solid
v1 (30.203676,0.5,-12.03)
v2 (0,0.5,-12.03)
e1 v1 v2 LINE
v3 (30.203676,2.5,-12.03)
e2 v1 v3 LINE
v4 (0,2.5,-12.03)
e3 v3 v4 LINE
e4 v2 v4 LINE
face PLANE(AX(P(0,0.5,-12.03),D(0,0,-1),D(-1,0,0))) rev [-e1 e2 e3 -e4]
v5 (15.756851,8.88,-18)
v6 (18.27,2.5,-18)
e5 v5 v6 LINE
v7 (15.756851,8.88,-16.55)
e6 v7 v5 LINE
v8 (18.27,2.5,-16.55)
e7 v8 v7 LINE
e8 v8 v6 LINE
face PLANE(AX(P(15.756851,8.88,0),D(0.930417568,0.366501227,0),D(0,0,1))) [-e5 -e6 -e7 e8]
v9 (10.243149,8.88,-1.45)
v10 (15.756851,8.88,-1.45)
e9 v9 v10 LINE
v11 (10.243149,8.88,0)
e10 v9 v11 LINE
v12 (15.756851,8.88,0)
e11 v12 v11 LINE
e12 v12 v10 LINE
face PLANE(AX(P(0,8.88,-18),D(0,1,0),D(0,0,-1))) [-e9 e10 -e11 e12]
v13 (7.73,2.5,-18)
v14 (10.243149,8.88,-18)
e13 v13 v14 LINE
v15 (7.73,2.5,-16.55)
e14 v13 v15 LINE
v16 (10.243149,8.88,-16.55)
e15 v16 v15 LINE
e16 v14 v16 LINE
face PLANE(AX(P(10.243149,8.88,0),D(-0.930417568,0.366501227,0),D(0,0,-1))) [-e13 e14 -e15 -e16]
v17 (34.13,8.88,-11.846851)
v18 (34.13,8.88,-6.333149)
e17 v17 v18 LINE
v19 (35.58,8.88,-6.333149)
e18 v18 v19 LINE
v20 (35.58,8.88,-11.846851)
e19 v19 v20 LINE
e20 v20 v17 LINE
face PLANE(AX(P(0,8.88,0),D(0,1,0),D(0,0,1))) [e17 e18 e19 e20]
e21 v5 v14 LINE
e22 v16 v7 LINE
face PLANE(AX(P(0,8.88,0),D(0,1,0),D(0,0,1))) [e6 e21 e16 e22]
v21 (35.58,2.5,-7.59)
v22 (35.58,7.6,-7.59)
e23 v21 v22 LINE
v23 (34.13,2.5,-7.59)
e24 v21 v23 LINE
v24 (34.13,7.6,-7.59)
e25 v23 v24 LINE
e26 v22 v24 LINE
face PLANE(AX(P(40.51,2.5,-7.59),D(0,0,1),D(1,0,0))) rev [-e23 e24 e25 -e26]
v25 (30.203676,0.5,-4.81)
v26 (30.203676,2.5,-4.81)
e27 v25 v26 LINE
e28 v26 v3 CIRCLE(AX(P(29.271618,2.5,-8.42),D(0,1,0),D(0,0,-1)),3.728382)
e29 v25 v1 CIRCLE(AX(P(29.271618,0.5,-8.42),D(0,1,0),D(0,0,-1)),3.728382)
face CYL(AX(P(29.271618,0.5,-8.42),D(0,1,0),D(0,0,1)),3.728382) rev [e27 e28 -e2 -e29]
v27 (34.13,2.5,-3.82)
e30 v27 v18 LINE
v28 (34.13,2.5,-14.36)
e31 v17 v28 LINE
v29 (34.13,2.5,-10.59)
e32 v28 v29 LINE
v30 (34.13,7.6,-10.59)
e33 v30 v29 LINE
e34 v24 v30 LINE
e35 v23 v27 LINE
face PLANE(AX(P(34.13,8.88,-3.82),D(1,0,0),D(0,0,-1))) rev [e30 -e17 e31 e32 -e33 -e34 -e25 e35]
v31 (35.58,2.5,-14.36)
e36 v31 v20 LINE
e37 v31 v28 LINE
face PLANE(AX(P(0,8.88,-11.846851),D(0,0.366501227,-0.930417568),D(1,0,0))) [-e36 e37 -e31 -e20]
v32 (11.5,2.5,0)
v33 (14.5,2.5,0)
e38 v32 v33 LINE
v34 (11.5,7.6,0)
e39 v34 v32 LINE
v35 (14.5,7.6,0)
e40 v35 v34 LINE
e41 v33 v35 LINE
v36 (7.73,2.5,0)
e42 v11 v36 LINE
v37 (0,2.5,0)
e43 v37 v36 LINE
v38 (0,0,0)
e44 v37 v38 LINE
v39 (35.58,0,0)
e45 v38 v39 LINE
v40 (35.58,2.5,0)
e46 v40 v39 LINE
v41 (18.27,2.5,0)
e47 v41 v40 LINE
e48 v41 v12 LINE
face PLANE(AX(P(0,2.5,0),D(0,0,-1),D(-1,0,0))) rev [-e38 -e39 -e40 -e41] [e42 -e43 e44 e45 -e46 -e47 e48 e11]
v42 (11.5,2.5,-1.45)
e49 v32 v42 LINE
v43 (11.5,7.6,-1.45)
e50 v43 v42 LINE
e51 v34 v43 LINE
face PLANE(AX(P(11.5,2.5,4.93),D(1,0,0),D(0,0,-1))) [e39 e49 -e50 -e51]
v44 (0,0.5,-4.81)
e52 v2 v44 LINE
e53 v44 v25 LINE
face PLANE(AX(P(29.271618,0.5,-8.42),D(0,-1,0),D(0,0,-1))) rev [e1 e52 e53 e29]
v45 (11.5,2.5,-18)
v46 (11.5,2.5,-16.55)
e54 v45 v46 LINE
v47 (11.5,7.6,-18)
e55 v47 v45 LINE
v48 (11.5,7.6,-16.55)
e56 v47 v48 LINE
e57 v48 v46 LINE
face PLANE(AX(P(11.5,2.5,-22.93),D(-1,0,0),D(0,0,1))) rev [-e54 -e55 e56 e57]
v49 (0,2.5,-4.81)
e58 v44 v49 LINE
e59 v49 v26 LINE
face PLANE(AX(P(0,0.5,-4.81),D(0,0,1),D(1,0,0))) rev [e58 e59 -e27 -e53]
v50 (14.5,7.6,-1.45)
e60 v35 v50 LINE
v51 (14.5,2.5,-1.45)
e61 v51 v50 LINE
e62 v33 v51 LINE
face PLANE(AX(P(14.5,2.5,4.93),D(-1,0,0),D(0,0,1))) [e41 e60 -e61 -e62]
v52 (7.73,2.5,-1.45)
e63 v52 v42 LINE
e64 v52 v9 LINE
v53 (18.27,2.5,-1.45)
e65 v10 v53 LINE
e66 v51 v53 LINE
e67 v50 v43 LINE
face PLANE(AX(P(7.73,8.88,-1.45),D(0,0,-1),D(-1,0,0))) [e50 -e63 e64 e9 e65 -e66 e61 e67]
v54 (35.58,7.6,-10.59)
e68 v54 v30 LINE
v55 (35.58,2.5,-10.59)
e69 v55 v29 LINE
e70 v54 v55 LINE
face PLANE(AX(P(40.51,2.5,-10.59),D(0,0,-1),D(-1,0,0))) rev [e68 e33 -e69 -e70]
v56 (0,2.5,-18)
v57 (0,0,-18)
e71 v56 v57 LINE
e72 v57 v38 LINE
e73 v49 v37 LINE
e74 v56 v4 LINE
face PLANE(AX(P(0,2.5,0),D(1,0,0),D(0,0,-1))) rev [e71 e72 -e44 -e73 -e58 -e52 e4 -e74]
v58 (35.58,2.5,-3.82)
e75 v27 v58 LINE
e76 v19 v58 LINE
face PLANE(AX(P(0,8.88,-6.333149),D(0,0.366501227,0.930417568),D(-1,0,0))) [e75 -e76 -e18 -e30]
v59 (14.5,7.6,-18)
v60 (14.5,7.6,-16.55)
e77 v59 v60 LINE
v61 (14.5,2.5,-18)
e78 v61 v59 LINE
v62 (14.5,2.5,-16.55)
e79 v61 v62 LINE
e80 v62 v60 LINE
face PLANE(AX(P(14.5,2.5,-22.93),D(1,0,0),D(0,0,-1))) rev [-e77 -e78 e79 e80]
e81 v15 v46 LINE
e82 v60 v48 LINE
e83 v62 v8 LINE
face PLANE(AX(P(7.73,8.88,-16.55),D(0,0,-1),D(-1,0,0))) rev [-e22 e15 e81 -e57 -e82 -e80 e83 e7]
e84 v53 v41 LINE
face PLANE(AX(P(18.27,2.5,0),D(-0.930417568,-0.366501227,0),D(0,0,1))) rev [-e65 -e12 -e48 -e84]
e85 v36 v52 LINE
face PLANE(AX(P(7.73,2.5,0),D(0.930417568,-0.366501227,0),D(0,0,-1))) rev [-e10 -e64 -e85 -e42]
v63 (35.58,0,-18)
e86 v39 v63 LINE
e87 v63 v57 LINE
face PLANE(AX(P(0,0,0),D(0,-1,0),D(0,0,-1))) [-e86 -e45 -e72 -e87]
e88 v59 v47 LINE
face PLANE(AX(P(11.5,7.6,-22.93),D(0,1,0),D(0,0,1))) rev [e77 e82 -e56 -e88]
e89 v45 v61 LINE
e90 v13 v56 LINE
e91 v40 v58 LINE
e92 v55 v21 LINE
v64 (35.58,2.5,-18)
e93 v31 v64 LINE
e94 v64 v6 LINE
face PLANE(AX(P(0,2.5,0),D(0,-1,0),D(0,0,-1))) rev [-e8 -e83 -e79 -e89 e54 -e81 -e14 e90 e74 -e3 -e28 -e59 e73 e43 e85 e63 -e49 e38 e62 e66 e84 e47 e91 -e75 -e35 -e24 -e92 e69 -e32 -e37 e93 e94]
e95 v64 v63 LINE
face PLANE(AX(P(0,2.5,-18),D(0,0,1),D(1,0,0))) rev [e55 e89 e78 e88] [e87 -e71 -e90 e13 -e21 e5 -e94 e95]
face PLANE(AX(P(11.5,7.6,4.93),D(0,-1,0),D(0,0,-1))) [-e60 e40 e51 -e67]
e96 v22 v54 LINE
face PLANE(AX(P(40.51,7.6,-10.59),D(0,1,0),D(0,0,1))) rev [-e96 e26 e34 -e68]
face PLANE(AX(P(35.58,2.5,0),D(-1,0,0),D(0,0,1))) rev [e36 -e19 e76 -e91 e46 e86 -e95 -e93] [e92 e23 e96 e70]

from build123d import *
from OCP.BRepFilletAPI import BRepFilletAPI_MakeChamfer

# Parameters (mm, degrees)
SKETCH1_W                  = 35.58
SKETCH1_H                  = 18
BOSS_EXTRUDE1_DEPTH        = 2.5
CUT_EXTRUDE1_DEPTH         = 2
SKETCH3_W                  = 10.54
SKETCH3_H                  = 1.45
BOSS_EXTRUDE2_DEPTH        = 6.38
CHAMFER1_SIZE              = 6.38
CHAMFER1_SIZE_2            = 2.513148834
SKETCH4_W                  = 3
SKETCH4_H                  = 5.1
CUT_EXTRUDE2_DEPTH         = 6.38
CHAMFER1_OF_MIRROR1_SIZE   = 6.38
CHAMFER1_OF_MIRROR1_SIZE_2 = 2.513148834
SKETCH14_W                 = 1.45
SKETCH14_H                 = 10.54
BOSS_EXTRUDE5_DEPTH        = 6.38
CHAMFER4_SIZE              = 6.38
CHAMFER4_SIZE_2            = 2.513148834
SKETCH15_W                 = 3
SKETCH15_H                 = 5.1
CUT_EXTRUDE4_DEPTH         = 6.38


with BuildPart() as part:
    # Sketch1 → Boss-Extrude1 (new body)
    with BuildSketch(Plane(origin=(0, 0, 0), x_dir=(1, 0, 0), z_dir=(0, 1, 0))):
        with Locations((17.79, 9)):
            Rectangle(SKETCH1_W, SKETCH1_H)
    extrude(amount=BOSS_EXTRUDE1_DEPTH)

    # Sketch2 → Cut-Extrude1 (cut)
    with BuildSketch(Plane(origin=(0, 2.5, 0), x_dir=(1, 0, 0), z_dir=(0, 1, 0))):
        with BuildLine():
            Line((0, 12.03), (30.203676308, 12.03))
            ThreePointArc((30.203676308, 12.03), (33, 8.42), (30.203676308, 4.81))
            Line((30.203676308, 4.81), (0, 4.81))
            Line((0, 4.81), (0, 12.03))
        make_face()
    extrude(amount=-CUT_EXTRUDE1_DEPTH, mode=Mode.SUBTRACT)

    # Sketch3 → Boss-Extrude2 (add)
    with BuildSketch(Plane(origin=(0, 2.5, 0), x_dir=(1, 0, 0), z_dir=(0, 1, 0))):
        with Locations((13, 17.275)):
            Rectangle(SKETCH3_W, SKETCH3_H)
    boss_extrude2 = extrude(amount=BOSS_EXTRUDE2_DEPTH)

    # Chamfer1
    chamfer1_edges_1 = [part.edges().sort_by_distance(p)[0] for p in [
        (18.27, 8.88, -17.275),
    ]]
    chamfer1_side_1 = [part.faces().sort_by_distance(p)[0] for p in [
        (18.27, 8.829737023, -17.275),
    ]]
    chamfer1_edges_2 = [part.edges().sort_by_distance(p)[0] for p in [
        (7.73, 8.88, -17.275),
    ]]
    chamfer1_side_2 = [part.faces().sort_by_distance(p)[0] for p in [
        (7.73, 8.829737023, -17.275),
    ]]
    chamfer1 = BRepFilletAPI_MakeChamfer(part.part.solid().wrapped)
    for e in chamfer1_edges_1:
        chamfer1.Add(CHAMFER1_SIZE - 0.0001, CHAMFER1_SIZE_2 - 0.0001, e.wrapped, chamfer1_side_1[0].wrapped)
    for e in chamfer1_edges_2:
        chamfer1.Add(CHAMFER1_SIZE - 0.0001, CHAMFER1_SIZE_2 - 0.0001, e.wrapped, chamfer1_side_2[0].wrapped)
    add(Compound.cast(chamfer1.Shape()), mode=Mode.REPLACE)  # a hair under: the kernel refuses the full size

    # Sketch4 → Cut-Extrude2 (cut)
    with BuildSketch(Plane.XY.offset(-16.55)):
        with Locations((13, 5.05)):
            Rectangle(SKETCH4_W, SKETCH4_H)
    cut_extrude2 = extrude(amount=-CUT_EXTRUDE2_DEPTH, mode=Mode.SUBTRACT)

    # Mirror1: Boss-Extrude2, Cut-Extrude2 across plane
    add(boss_extrude2.mirror(Plane.XY.offset(-9)))
    add(cut_extrude2.mirror(Plane.XY.offset(-9)), mode=Mode.SUBTRACT)

    # Chamfer1 of Mirror1
    chamfer1_of_mirror1_edges_1 = [part.edges().sort_by_distance(p)[0] for p in [
        (18.27, 8.88, -0.725),
    ]]
    chamfer1_of_mirror1_side_1 = [part.faces().sort_by_distance(p)[0] for p in [
        (18.27, 8.829737023, -0.725),
    ]]
    chamfer1_of_mirror1_edges_2 = [part.edges().sort_by_distance(p)[0] for p in [
        (7.73, 8.88, -0.725),
    ]]
    chamfer1_of_mirror1_side_2 = [part.faces().sort_by_distance(p)[0] for p in [
        (7.73, 8.829737023, -0.725),
    ]]
    chamfer1_of_mirror1 = BRepFilletAPI_MakeChamfer(part.part.solid().wrapped)
    for e in chamfer1_of_mirror1_edges_1:
        chamfer1_of_mirror1.Add(CHAMFER1_OF_MIRROR1_SIZE - 0.0001, CHAMFER1_OF_MIRROR1_SIZE_2 - 0.0001, e.wrapped, chamfer1_of_mirror1_side_1[0].wrapped)
    for e in chamfer1_of_mirror1_edges_2:
        chamfer1_of_mirror1.Add(CHAMFER1_OF_MIRROR1_SIZE - 0.0001, CHAMFER1_OF_MIRROR1_SIZE_2 - 0.0001, e.wrapped, chamfer1_of_mirror1_side_2[0].wrapped)
    add(Compound.cast(chamfer1_of_mirror1.Shape()), mode=Mode.REPLACE)  # a hair under: the kernel refuses the full size

    # Sketch14 → Boss-Extrude5 (add)
    with BuildSketch(Plane(origin=(0, 2.5, 0), x_dir=(1, 0, 0), z_dir=(0, 1, 0))):
        with Locations((34.855, 9.09)):
            Rectangle(SKETCH14_W, SKETCH14_H)
    extrude(amount=BOSS_EXTRUDE5_DEPTH)

    # Chamfer4
    chamfer4_edges_1 = [part.edges().sort_by_distance(p)[0] for p in [
        (34.855, 8.88, -14.36),
    ]]
    chamfer4_side_1 = [part.faces().sort_by_distance(p)[0] for p in [
        (34.855, 8.829737023, -14.36),
    ]]
    chamfer4_edges_2 = [part.edges().sort_by_distance(p)[0] for p in [
        (34.855, 8.88, -3.82),
    ]]
    chamfer4_side_2 = [part.faces().sort_by_distance(p)[0] for p in [
        (34.855, 8.829737023, -3.82),
    ]]
    chamfer4 = BRepFilletAPI_MakeChamfer(part.part.solid().wrapped)
    for e in chamfer4_edges_1:
        chamfer4.Add(CHAMFER4_SIZE - 0.0001, CHAMFER4_SIZE_2 - 0.0001, e.wrapped, chamfer4_side_1[0].wrapped)
    for e in chamfer4_edges_2:
        chamfer4.Add(CHAMFER4_SIZE - 0.0001, CHAMFER4_SIZE_2 - 0.0001, e.wrapped, chamfer4_side_2[0].wrapped)
    add(Compound.cast(chamfer4.Shape()), mode=Mode.REPLACE)  # a hair under: the kernel refuses the full size

    # Sketch15 → Cut-Extrude4 (cut)
    with BuildSketch(Plane.ZY.offset(-34.13)):
        with Locations((-9.09, 5.05)):
            Rectangle(SKETCH15_W, SKETCH15_H)
    extrude(amount=-CUT_EXTRUDE4_DEPTH, mode=Mode.SUBTRACT)


solid = part.part
